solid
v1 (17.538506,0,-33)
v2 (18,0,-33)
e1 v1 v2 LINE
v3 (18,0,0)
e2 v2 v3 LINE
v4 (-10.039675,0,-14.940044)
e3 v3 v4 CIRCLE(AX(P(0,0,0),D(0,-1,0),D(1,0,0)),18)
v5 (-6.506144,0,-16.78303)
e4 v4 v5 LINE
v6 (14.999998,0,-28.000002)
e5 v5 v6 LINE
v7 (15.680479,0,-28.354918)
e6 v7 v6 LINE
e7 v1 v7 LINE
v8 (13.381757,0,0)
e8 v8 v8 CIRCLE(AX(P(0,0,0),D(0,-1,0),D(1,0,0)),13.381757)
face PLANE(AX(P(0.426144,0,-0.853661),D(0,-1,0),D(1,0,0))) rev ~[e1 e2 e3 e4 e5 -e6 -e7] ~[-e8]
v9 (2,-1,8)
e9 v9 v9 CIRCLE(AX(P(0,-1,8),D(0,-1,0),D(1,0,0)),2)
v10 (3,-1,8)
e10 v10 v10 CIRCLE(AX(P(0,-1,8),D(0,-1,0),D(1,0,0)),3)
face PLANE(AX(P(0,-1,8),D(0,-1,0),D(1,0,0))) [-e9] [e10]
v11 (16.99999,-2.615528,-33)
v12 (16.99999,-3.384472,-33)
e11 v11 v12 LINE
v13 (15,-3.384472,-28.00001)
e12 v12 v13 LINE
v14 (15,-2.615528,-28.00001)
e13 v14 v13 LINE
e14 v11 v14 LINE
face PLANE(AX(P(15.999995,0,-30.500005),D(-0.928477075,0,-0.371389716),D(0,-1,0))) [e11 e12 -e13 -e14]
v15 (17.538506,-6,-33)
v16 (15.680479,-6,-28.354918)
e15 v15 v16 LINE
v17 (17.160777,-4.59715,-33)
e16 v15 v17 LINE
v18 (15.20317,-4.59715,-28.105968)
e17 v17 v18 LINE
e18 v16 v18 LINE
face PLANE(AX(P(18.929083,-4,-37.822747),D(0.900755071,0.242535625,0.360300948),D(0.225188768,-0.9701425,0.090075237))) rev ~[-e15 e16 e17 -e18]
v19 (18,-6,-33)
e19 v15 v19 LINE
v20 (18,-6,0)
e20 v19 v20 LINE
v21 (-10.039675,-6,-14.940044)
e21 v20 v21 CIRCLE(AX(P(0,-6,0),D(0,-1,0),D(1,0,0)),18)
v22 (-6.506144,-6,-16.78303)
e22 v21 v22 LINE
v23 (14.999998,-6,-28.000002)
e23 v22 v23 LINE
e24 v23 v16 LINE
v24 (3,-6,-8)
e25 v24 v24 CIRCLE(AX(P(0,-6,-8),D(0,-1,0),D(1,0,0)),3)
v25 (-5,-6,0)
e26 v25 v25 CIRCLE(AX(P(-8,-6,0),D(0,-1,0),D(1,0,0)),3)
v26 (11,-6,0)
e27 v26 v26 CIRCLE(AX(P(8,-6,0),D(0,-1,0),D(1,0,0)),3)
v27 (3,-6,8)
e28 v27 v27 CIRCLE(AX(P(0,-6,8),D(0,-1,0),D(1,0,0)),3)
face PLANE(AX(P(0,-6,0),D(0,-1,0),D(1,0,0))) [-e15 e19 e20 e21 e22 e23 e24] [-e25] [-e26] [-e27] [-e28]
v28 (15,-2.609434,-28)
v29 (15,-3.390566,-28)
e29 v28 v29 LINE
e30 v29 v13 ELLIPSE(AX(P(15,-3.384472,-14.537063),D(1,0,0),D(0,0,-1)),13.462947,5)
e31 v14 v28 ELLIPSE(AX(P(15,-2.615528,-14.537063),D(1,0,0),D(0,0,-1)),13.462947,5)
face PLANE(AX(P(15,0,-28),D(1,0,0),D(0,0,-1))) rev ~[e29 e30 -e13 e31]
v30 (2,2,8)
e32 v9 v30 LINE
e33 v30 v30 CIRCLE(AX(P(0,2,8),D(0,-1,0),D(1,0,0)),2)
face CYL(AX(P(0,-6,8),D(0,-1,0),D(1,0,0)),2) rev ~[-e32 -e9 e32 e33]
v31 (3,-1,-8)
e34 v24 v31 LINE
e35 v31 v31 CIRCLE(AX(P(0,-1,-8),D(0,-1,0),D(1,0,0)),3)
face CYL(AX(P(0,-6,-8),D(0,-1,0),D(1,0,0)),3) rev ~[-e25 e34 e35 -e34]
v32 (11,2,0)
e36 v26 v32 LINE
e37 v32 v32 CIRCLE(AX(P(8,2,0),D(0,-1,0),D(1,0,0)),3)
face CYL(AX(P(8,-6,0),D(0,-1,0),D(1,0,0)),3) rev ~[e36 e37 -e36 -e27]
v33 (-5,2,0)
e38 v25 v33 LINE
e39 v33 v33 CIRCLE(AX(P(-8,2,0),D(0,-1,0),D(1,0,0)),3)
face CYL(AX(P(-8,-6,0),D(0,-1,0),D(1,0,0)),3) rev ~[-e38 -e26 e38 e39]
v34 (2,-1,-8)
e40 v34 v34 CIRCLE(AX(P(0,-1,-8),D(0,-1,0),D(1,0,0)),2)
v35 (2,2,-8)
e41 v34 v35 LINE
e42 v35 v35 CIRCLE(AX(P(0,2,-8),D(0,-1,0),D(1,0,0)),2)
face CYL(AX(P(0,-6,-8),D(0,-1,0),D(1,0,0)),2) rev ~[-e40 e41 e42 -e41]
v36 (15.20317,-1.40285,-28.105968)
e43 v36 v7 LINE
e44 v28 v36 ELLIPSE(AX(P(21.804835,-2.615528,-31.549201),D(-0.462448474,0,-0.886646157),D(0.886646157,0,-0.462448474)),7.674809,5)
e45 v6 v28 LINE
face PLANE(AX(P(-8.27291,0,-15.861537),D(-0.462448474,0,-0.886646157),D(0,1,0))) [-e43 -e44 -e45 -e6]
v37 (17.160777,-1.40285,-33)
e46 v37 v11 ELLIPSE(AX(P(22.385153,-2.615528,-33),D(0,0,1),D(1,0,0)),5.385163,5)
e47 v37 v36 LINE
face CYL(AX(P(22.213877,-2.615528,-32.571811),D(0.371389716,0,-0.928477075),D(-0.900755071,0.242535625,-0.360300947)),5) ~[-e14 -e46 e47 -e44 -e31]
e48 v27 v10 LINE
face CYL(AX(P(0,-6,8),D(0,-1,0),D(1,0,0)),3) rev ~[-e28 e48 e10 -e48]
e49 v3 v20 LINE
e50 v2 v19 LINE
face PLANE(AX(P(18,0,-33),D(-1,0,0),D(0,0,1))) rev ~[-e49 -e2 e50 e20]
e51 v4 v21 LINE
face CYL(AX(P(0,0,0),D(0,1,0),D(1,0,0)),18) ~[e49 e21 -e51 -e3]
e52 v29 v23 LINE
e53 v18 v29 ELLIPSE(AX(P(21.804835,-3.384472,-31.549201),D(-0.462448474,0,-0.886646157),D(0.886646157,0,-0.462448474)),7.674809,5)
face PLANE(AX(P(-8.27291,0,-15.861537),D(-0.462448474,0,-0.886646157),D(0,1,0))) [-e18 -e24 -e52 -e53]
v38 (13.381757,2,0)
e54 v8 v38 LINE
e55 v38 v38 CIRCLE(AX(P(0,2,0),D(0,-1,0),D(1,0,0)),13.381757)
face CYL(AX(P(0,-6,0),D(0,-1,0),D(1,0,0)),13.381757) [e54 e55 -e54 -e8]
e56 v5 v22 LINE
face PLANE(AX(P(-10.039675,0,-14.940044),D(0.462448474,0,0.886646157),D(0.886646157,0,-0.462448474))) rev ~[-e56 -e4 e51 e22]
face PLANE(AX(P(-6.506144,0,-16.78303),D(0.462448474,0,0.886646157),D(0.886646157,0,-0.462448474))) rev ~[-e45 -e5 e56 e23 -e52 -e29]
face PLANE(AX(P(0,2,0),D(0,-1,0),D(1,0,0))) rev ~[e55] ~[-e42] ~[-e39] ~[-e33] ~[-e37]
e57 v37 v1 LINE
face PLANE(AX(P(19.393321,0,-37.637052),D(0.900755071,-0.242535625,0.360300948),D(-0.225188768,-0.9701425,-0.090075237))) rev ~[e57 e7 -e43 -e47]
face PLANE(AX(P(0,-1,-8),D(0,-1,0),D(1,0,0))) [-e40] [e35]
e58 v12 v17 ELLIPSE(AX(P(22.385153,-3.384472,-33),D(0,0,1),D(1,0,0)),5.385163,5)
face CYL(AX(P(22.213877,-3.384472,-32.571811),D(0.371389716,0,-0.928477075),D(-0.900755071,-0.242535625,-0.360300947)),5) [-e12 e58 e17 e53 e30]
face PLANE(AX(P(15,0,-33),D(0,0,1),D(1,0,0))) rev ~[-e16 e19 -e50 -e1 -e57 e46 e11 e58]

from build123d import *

# Parameters (mm, degrees)
F1_DEPTH    = 6
F2_SIZE2    = 4.99999
F2_SIZE     = 1.99999
F3_T4_DEPTH = 15.7736618076
F3_T9_DEPTH = 15.7736618076
F4_T4_DEPTH = 8.4627924491
F4_T9_DEPTH = 8.4627924491
F5_R        = 13.3817573781
F5_R_2      = 3
F5_R_3      = 2
F6_DEPTH    = 8
F7_DEPTH    = 8.001
F8_DEPTH    = 5


# Not quite as in the source:
# - a fillet or chamfer that OpenCascade refuses, or shapes differently, is made with other operations: its cross-section is extruded or revolved along the edge and cut away or added
# - a fillet or chamfer is up to 0.001 mm smaller than in the source, because OpenCascade refuses the exact size


with BuildPart() as f1:
    # F0 (on Front) → F1 (new body)
    with BuildSketch(Plane.XZ):
        with BuildLine():
            ThreePointArc((-6.5061441265, -16.7830297803), (10.1707769055, -14.8511042397), (18, 0))
            ThreePointArc((18, 0), (-8.4642142433, 15.8857507611), (-10.0396752493, -14.9400442064))
            Line((-10.0396752493, -14.9400442064), (-6.5061441265, -16.7830297803))
        make_face()
        with BuildLine():
            Line((18, -33), (18, 0))
            ThreePointArc((18, 0), (10.1707769055, -14.8511042397), (-6.5061441265, -16.7830297803))
            Line((-6.5061441265, -16.7830297803), (15, -28))
            Line((15, -28), (15, -33))
            Line((15, -33), (18, -33))
        make_face()
    extrude(amount=F1_DEPTH)

    # F2 (size 2 and 5 in the source; OpenCascade refuses exactly that, so slightly less here)
    f2_edges = [f1.edges().sort_by_distance(p)[0] for p in [
        (15, -3, -33),
    ]]
    f2_side = f1.faces().sort_by_distance((16.5, -3, -33))[0]
    chamfer(f2_edges, length=F2_SIZE, length2=F2_SIZE2, reference=f2_side)

    # F3: chamfer of 0.5 x 2 on 2 edges, made by hand


with BuildPart() as f3_tool2:
    # F3_s3 → F3_t4 (new body)
    with BuildSketch(Plane(origin=(15.653192591, 0, -39.1330988771), x_dir=(0, 1, 0), z_dir=(-0.3713897159, 0, 0.9284770751))):
        Polygon((0, -4.0282403683), (-2, -3.5282403683), (0, -3.5282403683), align=None)
    extrude(amount=F3_T4_DEPTH)

    split(bisect_by=Plane(origin=(-8.2729096879, 0, -15.8615369933), x_dir=(0, 1, 0), z_dir=(-0.4624484745, 0, -0.8866461574)), keep=Keep.TOP)


with BuildPart() as f1_1:
    add(f1.part)

    # F3_t1: cut F3_tool2
    add(f3_tool2.part, mode=Mode.SUBTRACT)


with BuildPart() as f3_tool7:
    # F3_s8 → F3_t9 (new body)
    with BuildSketch(Plane(origin=(15.653192591, 0, -39.1330988771), x_dir=(0, 1, 0), z_dir=(-0.3713897159, 0, 0.9284770751))):
        Polygon((-4, -3.5282403683), (-6, -4.0282403683), (-6, -3.5282403683), align=None)
    extrude(amount=F3_T9_DEPTH)

    split(bisect_by=Plane(origin=(-8.2729096879, 0, -15.8615369933), x_dir=(0, 1, 0), z_dir=(-0.4624484745, 0, -0.8866461574)), keep=Keep.TOP)


with BuildPart() as f1_2:
    add(f1_1.part)

    # F3_t6: cut F3_tool7
    add(f3_tool7.part, mode=Mode.SUBTRACT)

    # F4: fillet of radius 5 on 2 edges, made by hand


with BuildPart() as f4_tool2:
    # F4_s3 → F4_t4 (new body)
    with BuildSketch(Plane(origin=(14.2956017442, 0, -35.739111578), x_dir=(0, 1, 0), z_dir=(-0.3713897159, 0, 0.9284770751))):
        with BuildLine():
            ThreePointArc((-1.4028500029, -3.6775278676), (-2.0046118096, -3.5657025849), (-2.615528128, -3.5282403683))
            Line((-2.615528128, -3.5282403683), (-2, -3.5282403683))
            Line((-2, -3.5282403683), (-1.4028500029, -3.6775278676))
        make_face()
    extrude(amount=F4_T4_DEPTH)

    split(bisect_by=Plane(origin=(-8.2729096879, 0, -15.8615369933), x_dir=(0, 1, 0), z_dir=(-0.4624484745, 0, -0.8866461574)), keep=Keep.TOP)


with BuildPart() as f1_3:
    add(f1_2.part)

    # F4_t1: cut F4_tool2
    add(f4_tool2.part, mode=Mode.SUBTRACT)


with BuildPart() as f4_tool7:
    # F4_s8 → F4_t9 (new body)
    with BuildSketch(Plane(origin=(14.2956017442, 0, -35.739111578), x_dir=(0, 1, 0), z_dir=(-0.3713897159, 0, 0.9284770751))):
        with BuildLine():
            ThreePointArc((-4.5971499971, -3.6775278676), (-3.9953881904, -3.5657025849), (-3.384471872, -3.5282403683))
            Line((-3.384471872, -3.5282403683), (-4, -3.5282403683))
            Line((-4, -3.5282403683), (-4.5971499971, -3.6775278676))
        make_face()
    extrude(amount=F4_T9_DEPTH)

    split(bisect_by=Plane(origin=(-8.2729096879, 0, -15.8615369933), x_dir=(0, 1, 0), z_dir=(-0.4624484745, 0, -0.8866461574)), keep=Keep.TOP)


with BuildPart() as f1_4:
    add(f1_3.part)

    # F4_t6: cut F4_tool7
    add(f4_tool7.part, mode=Mode.SUBTRACT)

    # F5 (on face) → F6 (join)
    with BuildSketch(Plane.XZ.offset(6)):
        Circle(F5_R)
        with Locations((0, -8)):
            Circle(F5_R_2, mode=Mode.SUBTRACT)
        with Locations((-8, 0)):
            Circle(F5_R_2, mode=Mode.SUBTRACT)
        with Locations((8, 0)):
            Circle(F5_R_2, mode=Mode.SUBTRACT)
        with Locations((0, 8)):
            Circle(F5_R_2, mode=Mode.SUBTRACT)
        with Locations((0, 8)):
            Circle(F5_R_2)
        with Locations((0, 8)):
            Circle(F5_R_3, mode=Mode.SUBTRACT)
        with Locations((0, -8)):
            Circle(F5_R_2)
        with Locations((0, -8)):
            Circle(F5_R_3, mode=Mode.SUBTRACT)
        with Locations((-8, 0)):
            Circle(F5_R_2)
        with Locations((8, 0)):
            Circle(F5_R_2)
        with Locations((0, 8)):
            Circle(F5_R_3)
        with Locations((0, -8)):
            Circle(F5_R_3)
    extrude(amount=-F6_DEPTH)

    # F5 (on face) → F7 (cut, through all)
    with BuildSketch(Plane.XZ.offset(6)):
        with Locations((-8, 0)):
            Circle(F5_R_2)
        with Locations((0, 8)):
            Circle(F5_R_3)
        with Locations((8, 0)):
            Circle(F5_R_2)
        with Locations((0, -8)):
            Circle(F5_R_3)
    extrude(amount=-F7_DEPTH, mode=Mode.SUBTRACT)

    # F5 (on face) → F8 (cut)
    with BuildSketch(Plane.XZ.offset(6)):
        with Locations((0, 8)):
            Circle(F5_R_2)
        with Locations((0, 8)):
            Circle(F5_R_3, mode=Mode.SUBTRACT)
        with Locations((0, -8)):
            Circle(F5_R_2)
        with Locations((0, -8)):
            Circle(F5_R_3, mode=Mode.SUBTRACT)
    extrude(amount=-F8_DEPTH, mode=Mode.SUBTRACT)


solid = f1_4.part
